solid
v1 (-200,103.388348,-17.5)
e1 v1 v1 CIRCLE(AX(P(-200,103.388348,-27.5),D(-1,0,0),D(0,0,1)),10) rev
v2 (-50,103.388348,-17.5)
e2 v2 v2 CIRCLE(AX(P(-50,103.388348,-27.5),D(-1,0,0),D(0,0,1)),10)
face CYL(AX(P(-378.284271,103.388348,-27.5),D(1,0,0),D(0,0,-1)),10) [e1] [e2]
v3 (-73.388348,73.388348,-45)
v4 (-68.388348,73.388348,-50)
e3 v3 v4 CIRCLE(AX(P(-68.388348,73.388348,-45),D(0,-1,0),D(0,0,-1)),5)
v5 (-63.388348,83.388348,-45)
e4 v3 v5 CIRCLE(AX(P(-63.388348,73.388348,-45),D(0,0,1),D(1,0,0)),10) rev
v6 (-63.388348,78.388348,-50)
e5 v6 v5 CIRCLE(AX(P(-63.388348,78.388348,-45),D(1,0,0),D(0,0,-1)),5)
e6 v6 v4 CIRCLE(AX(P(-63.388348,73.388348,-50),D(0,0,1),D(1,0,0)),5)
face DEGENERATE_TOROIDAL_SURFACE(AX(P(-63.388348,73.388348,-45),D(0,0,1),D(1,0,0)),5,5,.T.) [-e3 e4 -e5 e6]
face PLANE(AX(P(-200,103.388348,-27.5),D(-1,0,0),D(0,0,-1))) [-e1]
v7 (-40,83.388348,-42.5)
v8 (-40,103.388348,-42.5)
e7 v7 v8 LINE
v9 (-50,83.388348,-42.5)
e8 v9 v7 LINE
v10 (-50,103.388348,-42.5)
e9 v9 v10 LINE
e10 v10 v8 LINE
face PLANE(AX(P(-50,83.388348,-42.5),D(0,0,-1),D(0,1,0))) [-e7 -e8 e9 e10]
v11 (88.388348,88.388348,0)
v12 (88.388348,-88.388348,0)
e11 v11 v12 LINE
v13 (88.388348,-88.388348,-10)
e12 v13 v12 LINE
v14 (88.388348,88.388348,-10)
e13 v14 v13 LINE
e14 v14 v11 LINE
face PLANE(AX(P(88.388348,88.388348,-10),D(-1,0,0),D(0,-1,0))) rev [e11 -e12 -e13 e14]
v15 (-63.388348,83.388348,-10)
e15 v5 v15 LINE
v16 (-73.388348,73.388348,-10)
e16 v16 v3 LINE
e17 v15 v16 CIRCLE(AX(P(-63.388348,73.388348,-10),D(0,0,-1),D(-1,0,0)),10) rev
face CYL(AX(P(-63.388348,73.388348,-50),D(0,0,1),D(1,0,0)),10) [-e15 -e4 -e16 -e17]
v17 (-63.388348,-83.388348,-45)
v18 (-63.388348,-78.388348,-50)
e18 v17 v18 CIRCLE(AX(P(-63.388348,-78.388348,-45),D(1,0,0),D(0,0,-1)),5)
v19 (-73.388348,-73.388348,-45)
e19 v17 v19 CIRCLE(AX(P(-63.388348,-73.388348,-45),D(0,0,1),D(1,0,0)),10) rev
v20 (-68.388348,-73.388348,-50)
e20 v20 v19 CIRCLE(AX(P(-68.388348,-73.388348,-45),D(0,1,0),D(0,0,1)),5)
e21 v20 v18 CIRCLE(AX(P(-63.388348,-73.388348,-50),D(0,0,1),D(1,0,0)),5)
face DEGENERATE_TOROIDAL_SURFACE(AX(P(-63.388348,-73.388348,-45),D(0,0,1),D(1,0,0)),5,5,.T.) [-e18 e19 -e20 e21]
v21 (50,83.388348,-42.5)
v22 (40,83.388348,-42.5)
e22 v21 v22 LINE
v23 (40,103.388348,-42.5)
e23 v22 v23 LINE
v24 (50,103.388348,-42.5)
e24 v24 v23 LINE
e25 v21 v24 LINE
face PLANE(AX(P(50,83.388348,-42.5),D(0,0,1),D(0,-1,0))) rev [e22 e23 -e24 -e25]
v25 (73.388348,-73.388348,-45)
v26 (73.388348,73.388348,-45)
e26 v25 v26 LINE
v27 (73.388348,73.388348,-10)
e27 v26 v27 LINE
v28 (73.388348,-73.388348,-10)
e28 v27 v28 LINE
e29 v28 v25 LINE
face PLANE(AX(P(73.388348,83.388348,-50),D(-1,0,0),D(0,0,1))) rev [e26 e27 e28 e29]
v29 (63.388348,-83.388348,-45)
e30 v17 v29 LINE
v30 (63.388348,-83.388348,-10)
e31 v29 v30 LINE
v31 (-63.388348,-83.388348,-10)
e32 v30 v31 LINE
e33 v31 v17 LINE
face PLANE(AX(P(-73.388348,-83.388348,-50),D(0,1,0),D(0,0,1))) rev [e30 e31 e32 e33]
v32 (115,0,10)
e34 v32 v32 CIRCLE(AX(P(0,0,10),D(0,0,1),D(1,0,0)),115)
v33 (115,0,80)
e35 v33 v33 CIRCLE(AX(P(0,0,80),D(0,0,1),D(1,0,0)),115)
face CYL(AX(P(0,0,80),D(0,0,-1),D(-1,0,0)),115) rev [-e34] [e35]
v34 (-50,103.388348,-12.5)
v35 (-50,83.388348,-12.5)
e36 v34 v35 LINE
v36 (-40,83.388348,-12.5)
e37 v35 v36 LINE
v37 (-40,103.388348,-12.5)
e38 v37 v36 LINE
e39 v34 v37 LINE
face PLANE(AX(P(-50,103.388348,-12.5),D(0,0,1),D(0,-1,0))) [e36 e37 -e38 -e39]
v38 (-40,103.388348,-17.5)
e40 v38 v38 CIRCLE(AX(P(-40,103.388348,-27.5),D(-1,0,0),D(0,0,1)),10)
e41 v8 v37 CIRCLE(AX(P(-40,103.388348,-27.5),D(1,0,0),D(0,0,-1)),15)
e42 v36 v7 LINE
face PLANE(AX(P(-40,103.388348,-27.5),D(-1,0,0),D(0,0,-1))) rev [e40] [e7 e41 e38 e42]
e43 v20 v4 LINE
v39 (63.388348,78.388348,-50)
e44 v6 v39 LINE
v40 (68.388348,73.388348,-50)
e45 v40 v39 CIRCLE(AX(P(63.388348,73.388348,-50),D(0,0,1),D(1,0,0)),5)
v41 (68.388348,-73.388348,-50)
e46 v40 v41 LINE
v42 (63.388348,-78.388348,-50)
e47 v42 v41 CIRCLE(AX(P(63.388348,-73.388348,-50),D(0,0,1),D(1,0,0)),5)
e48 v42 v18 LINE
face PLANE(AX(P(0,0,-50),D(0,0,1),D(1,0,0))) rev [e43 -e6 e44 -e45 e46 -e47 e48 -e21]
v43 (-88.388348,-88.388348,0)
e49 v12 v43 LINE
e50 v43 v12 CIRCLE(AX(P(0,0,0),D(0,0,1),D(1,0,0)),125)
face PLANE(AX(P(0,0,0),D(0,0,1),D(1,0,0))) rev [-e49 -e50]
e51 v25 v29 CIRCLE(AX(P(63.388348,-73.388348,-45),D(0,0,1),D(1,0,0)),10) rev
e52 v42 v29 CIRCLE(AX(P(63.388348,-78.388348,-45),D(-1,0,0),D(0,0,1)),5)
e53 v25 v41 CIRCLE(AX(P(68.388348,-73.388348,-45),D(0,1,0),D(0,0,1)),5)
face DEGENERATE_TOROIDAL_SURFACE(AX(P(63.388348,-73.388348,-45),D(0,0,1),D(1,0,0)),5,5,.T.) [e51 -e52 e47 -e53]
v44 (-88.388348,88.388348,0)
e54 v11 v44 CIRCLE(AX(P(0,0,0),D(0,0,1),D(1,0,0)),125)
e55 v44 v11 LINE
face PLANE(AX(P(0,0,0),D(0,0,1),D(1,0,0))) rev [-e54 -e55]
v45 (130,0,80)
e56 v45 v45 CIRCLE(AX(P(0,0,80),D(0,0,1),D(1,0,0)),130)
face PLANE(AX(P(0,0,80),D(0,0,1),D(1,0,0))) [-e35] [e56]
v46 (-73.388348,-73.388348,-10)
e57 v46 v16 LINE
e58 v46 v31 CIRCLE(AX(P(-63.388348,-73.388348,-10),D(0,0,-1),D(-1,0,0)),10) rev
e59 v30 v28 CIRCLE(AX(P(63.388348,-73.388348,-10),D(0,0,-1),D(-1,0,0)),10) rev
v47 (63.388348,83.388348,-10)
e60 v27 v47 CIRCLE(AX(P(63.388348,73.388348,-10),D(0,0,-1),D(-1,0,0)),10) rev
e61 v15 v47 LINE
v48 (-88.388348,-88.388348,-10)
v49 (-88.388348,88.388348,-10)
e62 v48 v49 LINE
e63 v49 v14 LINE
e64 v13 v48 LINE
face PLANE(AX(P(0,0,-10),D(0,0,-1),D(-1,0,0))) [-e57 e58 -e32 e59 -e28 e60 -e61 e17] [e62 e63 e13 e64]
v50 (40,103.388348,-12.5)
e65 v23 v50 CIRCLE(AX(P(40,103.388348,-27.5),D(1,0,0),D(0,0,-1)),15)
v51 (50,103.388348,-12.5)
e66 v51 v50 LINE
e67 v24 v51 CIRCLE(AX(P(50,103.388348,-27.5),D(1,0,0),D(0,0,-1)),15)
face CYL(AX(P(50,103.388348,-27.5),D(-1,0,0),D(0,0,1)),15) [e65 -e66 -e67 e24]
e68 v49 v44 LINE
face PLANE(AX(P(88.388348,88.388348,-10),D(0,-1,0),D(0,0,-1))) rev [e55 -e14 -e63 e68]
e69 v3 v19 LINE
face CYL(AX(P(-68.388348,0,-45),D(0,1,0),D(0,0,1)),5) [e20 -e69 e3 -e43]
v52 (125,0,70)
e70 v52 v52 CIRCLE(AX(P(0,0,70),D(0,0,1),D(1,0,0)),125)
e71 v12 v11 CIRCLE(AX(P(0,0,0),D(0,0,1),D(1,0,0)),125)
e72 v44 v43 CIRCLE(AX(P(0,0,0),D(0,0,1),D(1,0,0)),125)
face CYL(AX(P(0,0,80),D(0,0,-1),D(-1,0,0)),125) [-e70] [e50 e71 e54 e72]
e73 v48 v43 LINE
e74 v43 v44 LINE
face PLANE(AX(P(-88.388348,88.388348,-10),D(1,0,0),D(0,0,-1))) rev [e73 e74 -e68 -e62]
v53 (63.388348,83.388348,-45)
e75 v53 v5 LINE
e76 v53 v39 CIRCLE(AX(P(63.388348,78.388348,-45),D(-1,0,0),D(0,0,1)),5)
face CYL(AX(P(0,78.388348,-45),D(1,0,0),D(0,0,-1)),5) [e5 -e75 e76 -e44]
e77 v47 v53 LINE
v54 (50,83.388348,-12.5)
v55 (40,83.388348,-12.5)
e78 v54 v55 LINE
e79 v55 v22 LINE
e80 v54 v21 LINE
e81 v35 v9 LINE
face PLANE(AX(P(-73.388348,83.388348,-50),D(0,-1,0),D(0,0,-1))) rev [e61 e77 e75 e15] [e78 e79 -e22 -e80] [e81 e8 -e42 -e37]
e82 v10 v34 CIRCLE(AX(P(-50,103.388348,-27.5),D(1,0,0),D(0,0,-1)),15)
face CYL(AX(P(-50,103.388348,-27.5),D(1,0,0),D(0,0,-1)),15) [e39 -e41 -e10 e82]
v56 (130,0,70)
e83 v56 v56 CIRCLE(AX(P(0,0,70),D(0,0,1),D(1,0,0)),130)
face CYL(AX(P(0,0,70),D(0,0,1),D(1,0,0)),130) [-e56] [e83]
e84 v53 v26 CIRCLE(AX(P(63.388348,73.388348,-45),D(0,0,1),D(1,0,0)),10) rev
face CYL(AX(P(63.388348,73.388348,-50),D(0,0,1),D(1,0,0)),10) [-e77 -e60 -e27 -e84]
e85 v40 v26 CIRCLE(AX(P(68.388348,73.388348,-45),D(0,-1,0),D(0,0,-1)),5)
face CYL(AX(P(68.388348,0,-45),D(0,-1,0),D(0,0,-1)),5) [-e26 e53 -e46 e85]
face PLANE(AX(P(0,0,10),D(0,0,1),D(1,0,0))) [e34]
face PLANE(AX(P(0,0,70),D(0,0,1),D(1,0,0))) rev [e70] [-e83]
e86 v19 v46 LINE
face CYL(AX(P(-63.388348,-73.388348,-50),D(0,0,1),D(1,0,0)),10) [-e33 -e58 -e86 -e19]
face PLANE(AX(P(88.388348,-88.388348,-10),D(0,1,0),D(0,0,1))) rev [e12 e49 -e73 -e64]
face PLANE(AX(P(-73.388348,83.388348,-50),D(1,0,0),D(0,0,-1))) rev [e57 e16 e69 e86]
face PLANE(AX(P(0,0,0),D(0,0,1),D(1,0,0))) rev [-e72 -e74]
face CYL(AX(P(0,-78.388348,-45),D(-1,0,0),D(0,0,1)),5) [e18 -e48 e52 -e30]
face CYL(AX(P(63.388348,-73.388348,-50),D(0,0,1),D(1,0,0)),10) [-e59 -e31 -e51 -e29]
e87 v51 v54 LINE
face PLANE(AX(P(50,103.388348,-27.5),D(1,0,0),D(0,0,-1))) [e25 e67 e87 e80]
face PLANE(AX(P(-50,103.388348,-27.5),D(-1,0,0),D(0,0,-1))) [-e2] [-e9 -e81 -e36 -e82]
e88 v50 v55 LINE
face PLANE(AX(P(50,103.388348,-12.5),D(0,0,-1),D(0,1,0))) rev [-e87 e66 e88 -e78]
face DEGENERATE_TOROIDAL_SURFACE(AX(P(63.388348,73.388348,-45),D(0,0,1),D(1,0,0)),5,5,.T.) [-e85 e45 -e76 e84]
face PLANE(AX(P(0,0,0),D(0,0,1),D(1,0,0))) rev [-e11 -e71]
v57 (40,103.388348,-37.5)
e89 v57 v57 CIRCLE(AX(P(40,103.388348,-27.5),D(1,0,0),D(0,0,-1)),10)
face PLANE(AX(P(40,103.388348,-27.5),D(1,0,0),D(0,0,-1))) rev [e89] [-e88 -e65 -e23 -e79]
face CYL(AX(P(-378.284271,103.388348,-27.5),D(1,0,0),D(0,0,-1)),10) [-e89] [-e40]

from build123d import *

# Parameters (mm, degrees)
LIGHT_SKETCH_R              = 125
LIGHT_EXTRUDE_DEPTH         = 80
LIGHT_SHELL_T               = -10
APERTURE_START              = -10
APERTURE_LIP_SKETCH_R       = 130
APERTURE_LIP_SKETCH_R_2     = 115
APERTURE_LIP_EXTRUDE_DEPTH  = 10
PLATE_SKETCH_W              = 176.776695296
PLATE_SKETCH_H              = 176.776695296
PLATE_EXTRUDE_DEPTH         = 10
ELECTRONICS_SKETCH_W        = 146.776695296
ELECTRONICS_SKETCH_H        = 166.776695296
ELECTRONICS_EXTRUDE_DEPTH   = 40
ELECTRONICS_BACK_FILLET_R   = 5
ELECTRONICS_SIDE_FILLET_R   = 10
HINGE_SUPPORT_EXTRUDE_DEPTH = 10
HINGE_POLE_SKETCH_R         = 10
HINGE_POLE_EXTRUDE_DEPTH    = 250


with BuildPart() as part:
    # Light Sketch → Light Extrude (new body)
    with BuildSketch(Plane.XY):
        Circle(LIGHT_SKETCH_R)
    extrude(amount=LIGHT_EXTRUDE_DEPTH)

    # Light Shell
    light_shell_openings = [part.faces().sort_by_distance(p)[0] for p in [
        (0, 0, 80),
    ]]
    offset(amount=LIGHT_SHELL_T, openings=light_shell_openings, kind=Kind.INTERSECTION)

    # Aperture Lip Sketch → Aperture Lip Extrude (add)
    with BuildSketch(Plane.XY.offset(80).offset(APERTURE_START)):
        Circle(APERTURE_LIP_SKETCH_R)
        Circle(APERTURE_LIP_SKETCH_R_2, mode=Mode.SUBTRACT)
    extrude(amount=APERTURE_LIP_EXTRUDE_DEPTH)

    # Plate Sketch → Plate Extrude (add)
    with BuildSketch(Plane(origin=(0, 0, 0), x_dir=(-1, 0, 0), z_dir=(0, 0, -1))):
        Rectangle(PLATE_SKETCH_W, PLATE_SKETCH_H)
    extrude(amount=PLATE_EXTRUDE_DEPTH)

    # Electronics Sketch → Electronics Extrude (add)
    with BuildSketch(Plane(origin=(0, 0, -10), x_dir=(-1, 0, 0), z_dir=(0, 0, -1))):
        Rectangle(ELECTRONICS_SKETCH_W, ELECTRONICS_SKETCH_H)
    extrude(amount=ELECTRONICS_EXTRUDE_DEPTH)

    # Electronics Back Fillet
    electronics_back_fillet_edges = [part.edges().sort_by_distance(p)[0] for p in [
        (73.388347648, 0, -50),
        (0, -83.388347648, -50),
        (-73.388347648, 0, -50),
        (0, 83.388347648, -50),
    ]]
    fillet(electronics_back_fillet_edges, radius=ELECTRONICS_BACK_FILLET_R)

    # Electronics Side Fillet
    # the kernel refuses this fillet: 10 mm, written as the material it takes off along each edge
    with BuildSketch(Plane(origin=(-63.388347648, -73.388347648, -50), x_dir=(0, -1, 0), z_dir=(1, 0, 0))) as electronics_side_fillet_piece_1:
        with BuildLine():
            CenterArc((5, -5), 5, 0, 90)
            Line((10, -5), (10, 0))
            Line((10, 0), (5, 0))
        make_face()
    revolve(axis=Axis((-63.388347648, -73.388347648, -50), (0, 0, -1)), revolution_arc=90, mode=Mode.SUBTRACT)
    with BuildSketch(Plane(origin=(63.388347648, -73.388347648, -50), x_dir=(1, 0, 0), z_dir=(0, 1, 0))) as electronics_side_fillet_piece_2:
        with BuildLine():
            CenterArc((5, -5), 5, 0, 90)
            Line((10, -5), (10, 0))
            Line((10, 0), (5, 0))
        make_face()
    revolve(axis=Axis((63.388347648, -73.388347648, -50), (0, 0, -1)), revolution_arc=90, mode=Mode.SUBTRACT)
    with BuildSketch(Plane(origin=(-63.388347648, 73.388347648, -50), x_dir=(-1, 0, 0), z_dir=(0, -1, 0))) as electronics_side_fillet_piece_3:
        with BuildLine():
            CenterArc((5, -5), 5, 0, 90)
            Line((10, -5), (10, 0))
            Line((10, 0), (5, 0))
        make_face()
    revolve(axis=Axis((-63.388347648, 73.388347648, -50), (0, 0, -1)), revolution_arc=90, mode=Mode.SUBTRACT)
    with BuildSketch(Plane(origin=(63.388347648, 73.388347648, -50), x_dir=(0, 1, 0), z_dir=(-1, 0, 0))) as electronics_side_fillet_piece_4:
        with BuildLine():
            CenterArc((5, -5), 5, 0, 90)
            Line((10, -5), (10, 0))
            Line((10, 0), (5, 0))
        make_face()
    revolve(axis=Axis((63.388347648, 73.388347648, -50), (0, 0, -1)), revolution_arc=90, mode=Mode.SUBTRACT)
    with BuildSketch(Plane(origin=(73.388347648, 83.388347648, -10), x_dir=(-1, 0, 0), z_dir=(0, 0, -1)), Plane(origin=(-73.388347648, 83.388347648, -10), x_dir=(0, -1, 0), z_dir=(0, 0, -1))) as electronics_side_fillet_piece_5:
        with BuildLine():
            CenterArc((ELECTRONICS_SIDE_FILLET_R, -ELECTRONICS_SIDE_FILLET_R), ELECTRONICS_SIDE_FILLET_R, 90, 90)
            Line((0, -ELECTRONICS_SIDE_FILLET_R), (0, 0))
            Line((0, 0), (ELECTRONICS_SIDE_FILLET_R, 0))
        make_face()
    extrude(amount=40, mode=Mode.SUBTRACT)
    with BuildSketch(Plane(origin=(-73.388347648, -83.388347648, -10), x_dir=(0, 1, 0), z_dir=(0, 0, -1)), Plane(origin=(73.388347648, -83.388347648, -10), x_dir=(-1, 0, 0), z_dir=(0, 0, -1))) as electronics_side_fillet_piece_6:
        with BuildLine():
            CenterArc((ELECTRONICS_SIDE_FILLET_R, ELECTRONICS_SIDE_FILLET_R), ELECTRONICS_SIDE_FILLET_R, 180, 90)
            Line((0, ELECTRONICS_SIDE_FILLET_R), (0, 0))
            Line((0, 0), (ELECTRONICS_SIDE_FILLET_R, 0))
        make_face()
    extrude(amount=40, mode=Mode.SUBTRACT)

    # Hinge Support Sketch → Hinge Support Extrude (add)
    with BuildSketch(Plane(origin=(40, 0, 0), x_dir=(0, 0, -1), z_dir=(1, 0, 0))):
        with BuildLine():
            Line((12.5, 103.388347648), (12.5, 83.388347648))
            Line((12.5, 83.388347648), (42.5, 83.388347648))
            Line((42.5, 83.388347648), (42.5, 103.388347648))
            ThreePointArc((42.5, 103.388347648), (27.5, 118.388347648), (12.5, 103.388347648))
        make_face()
    hinge_support_extrude = extrude(amount=HINGE_SUPPORT_EXTRUDE_DEPTH)

    # Hinge Support Mirror: Hinge Support Extrude across plane
    add(hinge_support_extrude.mirror(Plane(origin=(0, 0, 0), x_dir=(0, 0, 1), z_dir=(1, 0, 0))))

    # Hinge Pole Sketch → Hinge Pole Extrude (add)
    with BuildSketch(Plane(origin=(50, 0, 0), x_dir=(0, 0, -1), z_dir=(1, 0, 0))):
        with Locations((27.5, 103.388347648)):
            Circle(HINGE_POLE_SKETCH_R)
    extrude(amount=-HINGE_POLE_EXTRUDE_DEPTH)


solid = part.part
